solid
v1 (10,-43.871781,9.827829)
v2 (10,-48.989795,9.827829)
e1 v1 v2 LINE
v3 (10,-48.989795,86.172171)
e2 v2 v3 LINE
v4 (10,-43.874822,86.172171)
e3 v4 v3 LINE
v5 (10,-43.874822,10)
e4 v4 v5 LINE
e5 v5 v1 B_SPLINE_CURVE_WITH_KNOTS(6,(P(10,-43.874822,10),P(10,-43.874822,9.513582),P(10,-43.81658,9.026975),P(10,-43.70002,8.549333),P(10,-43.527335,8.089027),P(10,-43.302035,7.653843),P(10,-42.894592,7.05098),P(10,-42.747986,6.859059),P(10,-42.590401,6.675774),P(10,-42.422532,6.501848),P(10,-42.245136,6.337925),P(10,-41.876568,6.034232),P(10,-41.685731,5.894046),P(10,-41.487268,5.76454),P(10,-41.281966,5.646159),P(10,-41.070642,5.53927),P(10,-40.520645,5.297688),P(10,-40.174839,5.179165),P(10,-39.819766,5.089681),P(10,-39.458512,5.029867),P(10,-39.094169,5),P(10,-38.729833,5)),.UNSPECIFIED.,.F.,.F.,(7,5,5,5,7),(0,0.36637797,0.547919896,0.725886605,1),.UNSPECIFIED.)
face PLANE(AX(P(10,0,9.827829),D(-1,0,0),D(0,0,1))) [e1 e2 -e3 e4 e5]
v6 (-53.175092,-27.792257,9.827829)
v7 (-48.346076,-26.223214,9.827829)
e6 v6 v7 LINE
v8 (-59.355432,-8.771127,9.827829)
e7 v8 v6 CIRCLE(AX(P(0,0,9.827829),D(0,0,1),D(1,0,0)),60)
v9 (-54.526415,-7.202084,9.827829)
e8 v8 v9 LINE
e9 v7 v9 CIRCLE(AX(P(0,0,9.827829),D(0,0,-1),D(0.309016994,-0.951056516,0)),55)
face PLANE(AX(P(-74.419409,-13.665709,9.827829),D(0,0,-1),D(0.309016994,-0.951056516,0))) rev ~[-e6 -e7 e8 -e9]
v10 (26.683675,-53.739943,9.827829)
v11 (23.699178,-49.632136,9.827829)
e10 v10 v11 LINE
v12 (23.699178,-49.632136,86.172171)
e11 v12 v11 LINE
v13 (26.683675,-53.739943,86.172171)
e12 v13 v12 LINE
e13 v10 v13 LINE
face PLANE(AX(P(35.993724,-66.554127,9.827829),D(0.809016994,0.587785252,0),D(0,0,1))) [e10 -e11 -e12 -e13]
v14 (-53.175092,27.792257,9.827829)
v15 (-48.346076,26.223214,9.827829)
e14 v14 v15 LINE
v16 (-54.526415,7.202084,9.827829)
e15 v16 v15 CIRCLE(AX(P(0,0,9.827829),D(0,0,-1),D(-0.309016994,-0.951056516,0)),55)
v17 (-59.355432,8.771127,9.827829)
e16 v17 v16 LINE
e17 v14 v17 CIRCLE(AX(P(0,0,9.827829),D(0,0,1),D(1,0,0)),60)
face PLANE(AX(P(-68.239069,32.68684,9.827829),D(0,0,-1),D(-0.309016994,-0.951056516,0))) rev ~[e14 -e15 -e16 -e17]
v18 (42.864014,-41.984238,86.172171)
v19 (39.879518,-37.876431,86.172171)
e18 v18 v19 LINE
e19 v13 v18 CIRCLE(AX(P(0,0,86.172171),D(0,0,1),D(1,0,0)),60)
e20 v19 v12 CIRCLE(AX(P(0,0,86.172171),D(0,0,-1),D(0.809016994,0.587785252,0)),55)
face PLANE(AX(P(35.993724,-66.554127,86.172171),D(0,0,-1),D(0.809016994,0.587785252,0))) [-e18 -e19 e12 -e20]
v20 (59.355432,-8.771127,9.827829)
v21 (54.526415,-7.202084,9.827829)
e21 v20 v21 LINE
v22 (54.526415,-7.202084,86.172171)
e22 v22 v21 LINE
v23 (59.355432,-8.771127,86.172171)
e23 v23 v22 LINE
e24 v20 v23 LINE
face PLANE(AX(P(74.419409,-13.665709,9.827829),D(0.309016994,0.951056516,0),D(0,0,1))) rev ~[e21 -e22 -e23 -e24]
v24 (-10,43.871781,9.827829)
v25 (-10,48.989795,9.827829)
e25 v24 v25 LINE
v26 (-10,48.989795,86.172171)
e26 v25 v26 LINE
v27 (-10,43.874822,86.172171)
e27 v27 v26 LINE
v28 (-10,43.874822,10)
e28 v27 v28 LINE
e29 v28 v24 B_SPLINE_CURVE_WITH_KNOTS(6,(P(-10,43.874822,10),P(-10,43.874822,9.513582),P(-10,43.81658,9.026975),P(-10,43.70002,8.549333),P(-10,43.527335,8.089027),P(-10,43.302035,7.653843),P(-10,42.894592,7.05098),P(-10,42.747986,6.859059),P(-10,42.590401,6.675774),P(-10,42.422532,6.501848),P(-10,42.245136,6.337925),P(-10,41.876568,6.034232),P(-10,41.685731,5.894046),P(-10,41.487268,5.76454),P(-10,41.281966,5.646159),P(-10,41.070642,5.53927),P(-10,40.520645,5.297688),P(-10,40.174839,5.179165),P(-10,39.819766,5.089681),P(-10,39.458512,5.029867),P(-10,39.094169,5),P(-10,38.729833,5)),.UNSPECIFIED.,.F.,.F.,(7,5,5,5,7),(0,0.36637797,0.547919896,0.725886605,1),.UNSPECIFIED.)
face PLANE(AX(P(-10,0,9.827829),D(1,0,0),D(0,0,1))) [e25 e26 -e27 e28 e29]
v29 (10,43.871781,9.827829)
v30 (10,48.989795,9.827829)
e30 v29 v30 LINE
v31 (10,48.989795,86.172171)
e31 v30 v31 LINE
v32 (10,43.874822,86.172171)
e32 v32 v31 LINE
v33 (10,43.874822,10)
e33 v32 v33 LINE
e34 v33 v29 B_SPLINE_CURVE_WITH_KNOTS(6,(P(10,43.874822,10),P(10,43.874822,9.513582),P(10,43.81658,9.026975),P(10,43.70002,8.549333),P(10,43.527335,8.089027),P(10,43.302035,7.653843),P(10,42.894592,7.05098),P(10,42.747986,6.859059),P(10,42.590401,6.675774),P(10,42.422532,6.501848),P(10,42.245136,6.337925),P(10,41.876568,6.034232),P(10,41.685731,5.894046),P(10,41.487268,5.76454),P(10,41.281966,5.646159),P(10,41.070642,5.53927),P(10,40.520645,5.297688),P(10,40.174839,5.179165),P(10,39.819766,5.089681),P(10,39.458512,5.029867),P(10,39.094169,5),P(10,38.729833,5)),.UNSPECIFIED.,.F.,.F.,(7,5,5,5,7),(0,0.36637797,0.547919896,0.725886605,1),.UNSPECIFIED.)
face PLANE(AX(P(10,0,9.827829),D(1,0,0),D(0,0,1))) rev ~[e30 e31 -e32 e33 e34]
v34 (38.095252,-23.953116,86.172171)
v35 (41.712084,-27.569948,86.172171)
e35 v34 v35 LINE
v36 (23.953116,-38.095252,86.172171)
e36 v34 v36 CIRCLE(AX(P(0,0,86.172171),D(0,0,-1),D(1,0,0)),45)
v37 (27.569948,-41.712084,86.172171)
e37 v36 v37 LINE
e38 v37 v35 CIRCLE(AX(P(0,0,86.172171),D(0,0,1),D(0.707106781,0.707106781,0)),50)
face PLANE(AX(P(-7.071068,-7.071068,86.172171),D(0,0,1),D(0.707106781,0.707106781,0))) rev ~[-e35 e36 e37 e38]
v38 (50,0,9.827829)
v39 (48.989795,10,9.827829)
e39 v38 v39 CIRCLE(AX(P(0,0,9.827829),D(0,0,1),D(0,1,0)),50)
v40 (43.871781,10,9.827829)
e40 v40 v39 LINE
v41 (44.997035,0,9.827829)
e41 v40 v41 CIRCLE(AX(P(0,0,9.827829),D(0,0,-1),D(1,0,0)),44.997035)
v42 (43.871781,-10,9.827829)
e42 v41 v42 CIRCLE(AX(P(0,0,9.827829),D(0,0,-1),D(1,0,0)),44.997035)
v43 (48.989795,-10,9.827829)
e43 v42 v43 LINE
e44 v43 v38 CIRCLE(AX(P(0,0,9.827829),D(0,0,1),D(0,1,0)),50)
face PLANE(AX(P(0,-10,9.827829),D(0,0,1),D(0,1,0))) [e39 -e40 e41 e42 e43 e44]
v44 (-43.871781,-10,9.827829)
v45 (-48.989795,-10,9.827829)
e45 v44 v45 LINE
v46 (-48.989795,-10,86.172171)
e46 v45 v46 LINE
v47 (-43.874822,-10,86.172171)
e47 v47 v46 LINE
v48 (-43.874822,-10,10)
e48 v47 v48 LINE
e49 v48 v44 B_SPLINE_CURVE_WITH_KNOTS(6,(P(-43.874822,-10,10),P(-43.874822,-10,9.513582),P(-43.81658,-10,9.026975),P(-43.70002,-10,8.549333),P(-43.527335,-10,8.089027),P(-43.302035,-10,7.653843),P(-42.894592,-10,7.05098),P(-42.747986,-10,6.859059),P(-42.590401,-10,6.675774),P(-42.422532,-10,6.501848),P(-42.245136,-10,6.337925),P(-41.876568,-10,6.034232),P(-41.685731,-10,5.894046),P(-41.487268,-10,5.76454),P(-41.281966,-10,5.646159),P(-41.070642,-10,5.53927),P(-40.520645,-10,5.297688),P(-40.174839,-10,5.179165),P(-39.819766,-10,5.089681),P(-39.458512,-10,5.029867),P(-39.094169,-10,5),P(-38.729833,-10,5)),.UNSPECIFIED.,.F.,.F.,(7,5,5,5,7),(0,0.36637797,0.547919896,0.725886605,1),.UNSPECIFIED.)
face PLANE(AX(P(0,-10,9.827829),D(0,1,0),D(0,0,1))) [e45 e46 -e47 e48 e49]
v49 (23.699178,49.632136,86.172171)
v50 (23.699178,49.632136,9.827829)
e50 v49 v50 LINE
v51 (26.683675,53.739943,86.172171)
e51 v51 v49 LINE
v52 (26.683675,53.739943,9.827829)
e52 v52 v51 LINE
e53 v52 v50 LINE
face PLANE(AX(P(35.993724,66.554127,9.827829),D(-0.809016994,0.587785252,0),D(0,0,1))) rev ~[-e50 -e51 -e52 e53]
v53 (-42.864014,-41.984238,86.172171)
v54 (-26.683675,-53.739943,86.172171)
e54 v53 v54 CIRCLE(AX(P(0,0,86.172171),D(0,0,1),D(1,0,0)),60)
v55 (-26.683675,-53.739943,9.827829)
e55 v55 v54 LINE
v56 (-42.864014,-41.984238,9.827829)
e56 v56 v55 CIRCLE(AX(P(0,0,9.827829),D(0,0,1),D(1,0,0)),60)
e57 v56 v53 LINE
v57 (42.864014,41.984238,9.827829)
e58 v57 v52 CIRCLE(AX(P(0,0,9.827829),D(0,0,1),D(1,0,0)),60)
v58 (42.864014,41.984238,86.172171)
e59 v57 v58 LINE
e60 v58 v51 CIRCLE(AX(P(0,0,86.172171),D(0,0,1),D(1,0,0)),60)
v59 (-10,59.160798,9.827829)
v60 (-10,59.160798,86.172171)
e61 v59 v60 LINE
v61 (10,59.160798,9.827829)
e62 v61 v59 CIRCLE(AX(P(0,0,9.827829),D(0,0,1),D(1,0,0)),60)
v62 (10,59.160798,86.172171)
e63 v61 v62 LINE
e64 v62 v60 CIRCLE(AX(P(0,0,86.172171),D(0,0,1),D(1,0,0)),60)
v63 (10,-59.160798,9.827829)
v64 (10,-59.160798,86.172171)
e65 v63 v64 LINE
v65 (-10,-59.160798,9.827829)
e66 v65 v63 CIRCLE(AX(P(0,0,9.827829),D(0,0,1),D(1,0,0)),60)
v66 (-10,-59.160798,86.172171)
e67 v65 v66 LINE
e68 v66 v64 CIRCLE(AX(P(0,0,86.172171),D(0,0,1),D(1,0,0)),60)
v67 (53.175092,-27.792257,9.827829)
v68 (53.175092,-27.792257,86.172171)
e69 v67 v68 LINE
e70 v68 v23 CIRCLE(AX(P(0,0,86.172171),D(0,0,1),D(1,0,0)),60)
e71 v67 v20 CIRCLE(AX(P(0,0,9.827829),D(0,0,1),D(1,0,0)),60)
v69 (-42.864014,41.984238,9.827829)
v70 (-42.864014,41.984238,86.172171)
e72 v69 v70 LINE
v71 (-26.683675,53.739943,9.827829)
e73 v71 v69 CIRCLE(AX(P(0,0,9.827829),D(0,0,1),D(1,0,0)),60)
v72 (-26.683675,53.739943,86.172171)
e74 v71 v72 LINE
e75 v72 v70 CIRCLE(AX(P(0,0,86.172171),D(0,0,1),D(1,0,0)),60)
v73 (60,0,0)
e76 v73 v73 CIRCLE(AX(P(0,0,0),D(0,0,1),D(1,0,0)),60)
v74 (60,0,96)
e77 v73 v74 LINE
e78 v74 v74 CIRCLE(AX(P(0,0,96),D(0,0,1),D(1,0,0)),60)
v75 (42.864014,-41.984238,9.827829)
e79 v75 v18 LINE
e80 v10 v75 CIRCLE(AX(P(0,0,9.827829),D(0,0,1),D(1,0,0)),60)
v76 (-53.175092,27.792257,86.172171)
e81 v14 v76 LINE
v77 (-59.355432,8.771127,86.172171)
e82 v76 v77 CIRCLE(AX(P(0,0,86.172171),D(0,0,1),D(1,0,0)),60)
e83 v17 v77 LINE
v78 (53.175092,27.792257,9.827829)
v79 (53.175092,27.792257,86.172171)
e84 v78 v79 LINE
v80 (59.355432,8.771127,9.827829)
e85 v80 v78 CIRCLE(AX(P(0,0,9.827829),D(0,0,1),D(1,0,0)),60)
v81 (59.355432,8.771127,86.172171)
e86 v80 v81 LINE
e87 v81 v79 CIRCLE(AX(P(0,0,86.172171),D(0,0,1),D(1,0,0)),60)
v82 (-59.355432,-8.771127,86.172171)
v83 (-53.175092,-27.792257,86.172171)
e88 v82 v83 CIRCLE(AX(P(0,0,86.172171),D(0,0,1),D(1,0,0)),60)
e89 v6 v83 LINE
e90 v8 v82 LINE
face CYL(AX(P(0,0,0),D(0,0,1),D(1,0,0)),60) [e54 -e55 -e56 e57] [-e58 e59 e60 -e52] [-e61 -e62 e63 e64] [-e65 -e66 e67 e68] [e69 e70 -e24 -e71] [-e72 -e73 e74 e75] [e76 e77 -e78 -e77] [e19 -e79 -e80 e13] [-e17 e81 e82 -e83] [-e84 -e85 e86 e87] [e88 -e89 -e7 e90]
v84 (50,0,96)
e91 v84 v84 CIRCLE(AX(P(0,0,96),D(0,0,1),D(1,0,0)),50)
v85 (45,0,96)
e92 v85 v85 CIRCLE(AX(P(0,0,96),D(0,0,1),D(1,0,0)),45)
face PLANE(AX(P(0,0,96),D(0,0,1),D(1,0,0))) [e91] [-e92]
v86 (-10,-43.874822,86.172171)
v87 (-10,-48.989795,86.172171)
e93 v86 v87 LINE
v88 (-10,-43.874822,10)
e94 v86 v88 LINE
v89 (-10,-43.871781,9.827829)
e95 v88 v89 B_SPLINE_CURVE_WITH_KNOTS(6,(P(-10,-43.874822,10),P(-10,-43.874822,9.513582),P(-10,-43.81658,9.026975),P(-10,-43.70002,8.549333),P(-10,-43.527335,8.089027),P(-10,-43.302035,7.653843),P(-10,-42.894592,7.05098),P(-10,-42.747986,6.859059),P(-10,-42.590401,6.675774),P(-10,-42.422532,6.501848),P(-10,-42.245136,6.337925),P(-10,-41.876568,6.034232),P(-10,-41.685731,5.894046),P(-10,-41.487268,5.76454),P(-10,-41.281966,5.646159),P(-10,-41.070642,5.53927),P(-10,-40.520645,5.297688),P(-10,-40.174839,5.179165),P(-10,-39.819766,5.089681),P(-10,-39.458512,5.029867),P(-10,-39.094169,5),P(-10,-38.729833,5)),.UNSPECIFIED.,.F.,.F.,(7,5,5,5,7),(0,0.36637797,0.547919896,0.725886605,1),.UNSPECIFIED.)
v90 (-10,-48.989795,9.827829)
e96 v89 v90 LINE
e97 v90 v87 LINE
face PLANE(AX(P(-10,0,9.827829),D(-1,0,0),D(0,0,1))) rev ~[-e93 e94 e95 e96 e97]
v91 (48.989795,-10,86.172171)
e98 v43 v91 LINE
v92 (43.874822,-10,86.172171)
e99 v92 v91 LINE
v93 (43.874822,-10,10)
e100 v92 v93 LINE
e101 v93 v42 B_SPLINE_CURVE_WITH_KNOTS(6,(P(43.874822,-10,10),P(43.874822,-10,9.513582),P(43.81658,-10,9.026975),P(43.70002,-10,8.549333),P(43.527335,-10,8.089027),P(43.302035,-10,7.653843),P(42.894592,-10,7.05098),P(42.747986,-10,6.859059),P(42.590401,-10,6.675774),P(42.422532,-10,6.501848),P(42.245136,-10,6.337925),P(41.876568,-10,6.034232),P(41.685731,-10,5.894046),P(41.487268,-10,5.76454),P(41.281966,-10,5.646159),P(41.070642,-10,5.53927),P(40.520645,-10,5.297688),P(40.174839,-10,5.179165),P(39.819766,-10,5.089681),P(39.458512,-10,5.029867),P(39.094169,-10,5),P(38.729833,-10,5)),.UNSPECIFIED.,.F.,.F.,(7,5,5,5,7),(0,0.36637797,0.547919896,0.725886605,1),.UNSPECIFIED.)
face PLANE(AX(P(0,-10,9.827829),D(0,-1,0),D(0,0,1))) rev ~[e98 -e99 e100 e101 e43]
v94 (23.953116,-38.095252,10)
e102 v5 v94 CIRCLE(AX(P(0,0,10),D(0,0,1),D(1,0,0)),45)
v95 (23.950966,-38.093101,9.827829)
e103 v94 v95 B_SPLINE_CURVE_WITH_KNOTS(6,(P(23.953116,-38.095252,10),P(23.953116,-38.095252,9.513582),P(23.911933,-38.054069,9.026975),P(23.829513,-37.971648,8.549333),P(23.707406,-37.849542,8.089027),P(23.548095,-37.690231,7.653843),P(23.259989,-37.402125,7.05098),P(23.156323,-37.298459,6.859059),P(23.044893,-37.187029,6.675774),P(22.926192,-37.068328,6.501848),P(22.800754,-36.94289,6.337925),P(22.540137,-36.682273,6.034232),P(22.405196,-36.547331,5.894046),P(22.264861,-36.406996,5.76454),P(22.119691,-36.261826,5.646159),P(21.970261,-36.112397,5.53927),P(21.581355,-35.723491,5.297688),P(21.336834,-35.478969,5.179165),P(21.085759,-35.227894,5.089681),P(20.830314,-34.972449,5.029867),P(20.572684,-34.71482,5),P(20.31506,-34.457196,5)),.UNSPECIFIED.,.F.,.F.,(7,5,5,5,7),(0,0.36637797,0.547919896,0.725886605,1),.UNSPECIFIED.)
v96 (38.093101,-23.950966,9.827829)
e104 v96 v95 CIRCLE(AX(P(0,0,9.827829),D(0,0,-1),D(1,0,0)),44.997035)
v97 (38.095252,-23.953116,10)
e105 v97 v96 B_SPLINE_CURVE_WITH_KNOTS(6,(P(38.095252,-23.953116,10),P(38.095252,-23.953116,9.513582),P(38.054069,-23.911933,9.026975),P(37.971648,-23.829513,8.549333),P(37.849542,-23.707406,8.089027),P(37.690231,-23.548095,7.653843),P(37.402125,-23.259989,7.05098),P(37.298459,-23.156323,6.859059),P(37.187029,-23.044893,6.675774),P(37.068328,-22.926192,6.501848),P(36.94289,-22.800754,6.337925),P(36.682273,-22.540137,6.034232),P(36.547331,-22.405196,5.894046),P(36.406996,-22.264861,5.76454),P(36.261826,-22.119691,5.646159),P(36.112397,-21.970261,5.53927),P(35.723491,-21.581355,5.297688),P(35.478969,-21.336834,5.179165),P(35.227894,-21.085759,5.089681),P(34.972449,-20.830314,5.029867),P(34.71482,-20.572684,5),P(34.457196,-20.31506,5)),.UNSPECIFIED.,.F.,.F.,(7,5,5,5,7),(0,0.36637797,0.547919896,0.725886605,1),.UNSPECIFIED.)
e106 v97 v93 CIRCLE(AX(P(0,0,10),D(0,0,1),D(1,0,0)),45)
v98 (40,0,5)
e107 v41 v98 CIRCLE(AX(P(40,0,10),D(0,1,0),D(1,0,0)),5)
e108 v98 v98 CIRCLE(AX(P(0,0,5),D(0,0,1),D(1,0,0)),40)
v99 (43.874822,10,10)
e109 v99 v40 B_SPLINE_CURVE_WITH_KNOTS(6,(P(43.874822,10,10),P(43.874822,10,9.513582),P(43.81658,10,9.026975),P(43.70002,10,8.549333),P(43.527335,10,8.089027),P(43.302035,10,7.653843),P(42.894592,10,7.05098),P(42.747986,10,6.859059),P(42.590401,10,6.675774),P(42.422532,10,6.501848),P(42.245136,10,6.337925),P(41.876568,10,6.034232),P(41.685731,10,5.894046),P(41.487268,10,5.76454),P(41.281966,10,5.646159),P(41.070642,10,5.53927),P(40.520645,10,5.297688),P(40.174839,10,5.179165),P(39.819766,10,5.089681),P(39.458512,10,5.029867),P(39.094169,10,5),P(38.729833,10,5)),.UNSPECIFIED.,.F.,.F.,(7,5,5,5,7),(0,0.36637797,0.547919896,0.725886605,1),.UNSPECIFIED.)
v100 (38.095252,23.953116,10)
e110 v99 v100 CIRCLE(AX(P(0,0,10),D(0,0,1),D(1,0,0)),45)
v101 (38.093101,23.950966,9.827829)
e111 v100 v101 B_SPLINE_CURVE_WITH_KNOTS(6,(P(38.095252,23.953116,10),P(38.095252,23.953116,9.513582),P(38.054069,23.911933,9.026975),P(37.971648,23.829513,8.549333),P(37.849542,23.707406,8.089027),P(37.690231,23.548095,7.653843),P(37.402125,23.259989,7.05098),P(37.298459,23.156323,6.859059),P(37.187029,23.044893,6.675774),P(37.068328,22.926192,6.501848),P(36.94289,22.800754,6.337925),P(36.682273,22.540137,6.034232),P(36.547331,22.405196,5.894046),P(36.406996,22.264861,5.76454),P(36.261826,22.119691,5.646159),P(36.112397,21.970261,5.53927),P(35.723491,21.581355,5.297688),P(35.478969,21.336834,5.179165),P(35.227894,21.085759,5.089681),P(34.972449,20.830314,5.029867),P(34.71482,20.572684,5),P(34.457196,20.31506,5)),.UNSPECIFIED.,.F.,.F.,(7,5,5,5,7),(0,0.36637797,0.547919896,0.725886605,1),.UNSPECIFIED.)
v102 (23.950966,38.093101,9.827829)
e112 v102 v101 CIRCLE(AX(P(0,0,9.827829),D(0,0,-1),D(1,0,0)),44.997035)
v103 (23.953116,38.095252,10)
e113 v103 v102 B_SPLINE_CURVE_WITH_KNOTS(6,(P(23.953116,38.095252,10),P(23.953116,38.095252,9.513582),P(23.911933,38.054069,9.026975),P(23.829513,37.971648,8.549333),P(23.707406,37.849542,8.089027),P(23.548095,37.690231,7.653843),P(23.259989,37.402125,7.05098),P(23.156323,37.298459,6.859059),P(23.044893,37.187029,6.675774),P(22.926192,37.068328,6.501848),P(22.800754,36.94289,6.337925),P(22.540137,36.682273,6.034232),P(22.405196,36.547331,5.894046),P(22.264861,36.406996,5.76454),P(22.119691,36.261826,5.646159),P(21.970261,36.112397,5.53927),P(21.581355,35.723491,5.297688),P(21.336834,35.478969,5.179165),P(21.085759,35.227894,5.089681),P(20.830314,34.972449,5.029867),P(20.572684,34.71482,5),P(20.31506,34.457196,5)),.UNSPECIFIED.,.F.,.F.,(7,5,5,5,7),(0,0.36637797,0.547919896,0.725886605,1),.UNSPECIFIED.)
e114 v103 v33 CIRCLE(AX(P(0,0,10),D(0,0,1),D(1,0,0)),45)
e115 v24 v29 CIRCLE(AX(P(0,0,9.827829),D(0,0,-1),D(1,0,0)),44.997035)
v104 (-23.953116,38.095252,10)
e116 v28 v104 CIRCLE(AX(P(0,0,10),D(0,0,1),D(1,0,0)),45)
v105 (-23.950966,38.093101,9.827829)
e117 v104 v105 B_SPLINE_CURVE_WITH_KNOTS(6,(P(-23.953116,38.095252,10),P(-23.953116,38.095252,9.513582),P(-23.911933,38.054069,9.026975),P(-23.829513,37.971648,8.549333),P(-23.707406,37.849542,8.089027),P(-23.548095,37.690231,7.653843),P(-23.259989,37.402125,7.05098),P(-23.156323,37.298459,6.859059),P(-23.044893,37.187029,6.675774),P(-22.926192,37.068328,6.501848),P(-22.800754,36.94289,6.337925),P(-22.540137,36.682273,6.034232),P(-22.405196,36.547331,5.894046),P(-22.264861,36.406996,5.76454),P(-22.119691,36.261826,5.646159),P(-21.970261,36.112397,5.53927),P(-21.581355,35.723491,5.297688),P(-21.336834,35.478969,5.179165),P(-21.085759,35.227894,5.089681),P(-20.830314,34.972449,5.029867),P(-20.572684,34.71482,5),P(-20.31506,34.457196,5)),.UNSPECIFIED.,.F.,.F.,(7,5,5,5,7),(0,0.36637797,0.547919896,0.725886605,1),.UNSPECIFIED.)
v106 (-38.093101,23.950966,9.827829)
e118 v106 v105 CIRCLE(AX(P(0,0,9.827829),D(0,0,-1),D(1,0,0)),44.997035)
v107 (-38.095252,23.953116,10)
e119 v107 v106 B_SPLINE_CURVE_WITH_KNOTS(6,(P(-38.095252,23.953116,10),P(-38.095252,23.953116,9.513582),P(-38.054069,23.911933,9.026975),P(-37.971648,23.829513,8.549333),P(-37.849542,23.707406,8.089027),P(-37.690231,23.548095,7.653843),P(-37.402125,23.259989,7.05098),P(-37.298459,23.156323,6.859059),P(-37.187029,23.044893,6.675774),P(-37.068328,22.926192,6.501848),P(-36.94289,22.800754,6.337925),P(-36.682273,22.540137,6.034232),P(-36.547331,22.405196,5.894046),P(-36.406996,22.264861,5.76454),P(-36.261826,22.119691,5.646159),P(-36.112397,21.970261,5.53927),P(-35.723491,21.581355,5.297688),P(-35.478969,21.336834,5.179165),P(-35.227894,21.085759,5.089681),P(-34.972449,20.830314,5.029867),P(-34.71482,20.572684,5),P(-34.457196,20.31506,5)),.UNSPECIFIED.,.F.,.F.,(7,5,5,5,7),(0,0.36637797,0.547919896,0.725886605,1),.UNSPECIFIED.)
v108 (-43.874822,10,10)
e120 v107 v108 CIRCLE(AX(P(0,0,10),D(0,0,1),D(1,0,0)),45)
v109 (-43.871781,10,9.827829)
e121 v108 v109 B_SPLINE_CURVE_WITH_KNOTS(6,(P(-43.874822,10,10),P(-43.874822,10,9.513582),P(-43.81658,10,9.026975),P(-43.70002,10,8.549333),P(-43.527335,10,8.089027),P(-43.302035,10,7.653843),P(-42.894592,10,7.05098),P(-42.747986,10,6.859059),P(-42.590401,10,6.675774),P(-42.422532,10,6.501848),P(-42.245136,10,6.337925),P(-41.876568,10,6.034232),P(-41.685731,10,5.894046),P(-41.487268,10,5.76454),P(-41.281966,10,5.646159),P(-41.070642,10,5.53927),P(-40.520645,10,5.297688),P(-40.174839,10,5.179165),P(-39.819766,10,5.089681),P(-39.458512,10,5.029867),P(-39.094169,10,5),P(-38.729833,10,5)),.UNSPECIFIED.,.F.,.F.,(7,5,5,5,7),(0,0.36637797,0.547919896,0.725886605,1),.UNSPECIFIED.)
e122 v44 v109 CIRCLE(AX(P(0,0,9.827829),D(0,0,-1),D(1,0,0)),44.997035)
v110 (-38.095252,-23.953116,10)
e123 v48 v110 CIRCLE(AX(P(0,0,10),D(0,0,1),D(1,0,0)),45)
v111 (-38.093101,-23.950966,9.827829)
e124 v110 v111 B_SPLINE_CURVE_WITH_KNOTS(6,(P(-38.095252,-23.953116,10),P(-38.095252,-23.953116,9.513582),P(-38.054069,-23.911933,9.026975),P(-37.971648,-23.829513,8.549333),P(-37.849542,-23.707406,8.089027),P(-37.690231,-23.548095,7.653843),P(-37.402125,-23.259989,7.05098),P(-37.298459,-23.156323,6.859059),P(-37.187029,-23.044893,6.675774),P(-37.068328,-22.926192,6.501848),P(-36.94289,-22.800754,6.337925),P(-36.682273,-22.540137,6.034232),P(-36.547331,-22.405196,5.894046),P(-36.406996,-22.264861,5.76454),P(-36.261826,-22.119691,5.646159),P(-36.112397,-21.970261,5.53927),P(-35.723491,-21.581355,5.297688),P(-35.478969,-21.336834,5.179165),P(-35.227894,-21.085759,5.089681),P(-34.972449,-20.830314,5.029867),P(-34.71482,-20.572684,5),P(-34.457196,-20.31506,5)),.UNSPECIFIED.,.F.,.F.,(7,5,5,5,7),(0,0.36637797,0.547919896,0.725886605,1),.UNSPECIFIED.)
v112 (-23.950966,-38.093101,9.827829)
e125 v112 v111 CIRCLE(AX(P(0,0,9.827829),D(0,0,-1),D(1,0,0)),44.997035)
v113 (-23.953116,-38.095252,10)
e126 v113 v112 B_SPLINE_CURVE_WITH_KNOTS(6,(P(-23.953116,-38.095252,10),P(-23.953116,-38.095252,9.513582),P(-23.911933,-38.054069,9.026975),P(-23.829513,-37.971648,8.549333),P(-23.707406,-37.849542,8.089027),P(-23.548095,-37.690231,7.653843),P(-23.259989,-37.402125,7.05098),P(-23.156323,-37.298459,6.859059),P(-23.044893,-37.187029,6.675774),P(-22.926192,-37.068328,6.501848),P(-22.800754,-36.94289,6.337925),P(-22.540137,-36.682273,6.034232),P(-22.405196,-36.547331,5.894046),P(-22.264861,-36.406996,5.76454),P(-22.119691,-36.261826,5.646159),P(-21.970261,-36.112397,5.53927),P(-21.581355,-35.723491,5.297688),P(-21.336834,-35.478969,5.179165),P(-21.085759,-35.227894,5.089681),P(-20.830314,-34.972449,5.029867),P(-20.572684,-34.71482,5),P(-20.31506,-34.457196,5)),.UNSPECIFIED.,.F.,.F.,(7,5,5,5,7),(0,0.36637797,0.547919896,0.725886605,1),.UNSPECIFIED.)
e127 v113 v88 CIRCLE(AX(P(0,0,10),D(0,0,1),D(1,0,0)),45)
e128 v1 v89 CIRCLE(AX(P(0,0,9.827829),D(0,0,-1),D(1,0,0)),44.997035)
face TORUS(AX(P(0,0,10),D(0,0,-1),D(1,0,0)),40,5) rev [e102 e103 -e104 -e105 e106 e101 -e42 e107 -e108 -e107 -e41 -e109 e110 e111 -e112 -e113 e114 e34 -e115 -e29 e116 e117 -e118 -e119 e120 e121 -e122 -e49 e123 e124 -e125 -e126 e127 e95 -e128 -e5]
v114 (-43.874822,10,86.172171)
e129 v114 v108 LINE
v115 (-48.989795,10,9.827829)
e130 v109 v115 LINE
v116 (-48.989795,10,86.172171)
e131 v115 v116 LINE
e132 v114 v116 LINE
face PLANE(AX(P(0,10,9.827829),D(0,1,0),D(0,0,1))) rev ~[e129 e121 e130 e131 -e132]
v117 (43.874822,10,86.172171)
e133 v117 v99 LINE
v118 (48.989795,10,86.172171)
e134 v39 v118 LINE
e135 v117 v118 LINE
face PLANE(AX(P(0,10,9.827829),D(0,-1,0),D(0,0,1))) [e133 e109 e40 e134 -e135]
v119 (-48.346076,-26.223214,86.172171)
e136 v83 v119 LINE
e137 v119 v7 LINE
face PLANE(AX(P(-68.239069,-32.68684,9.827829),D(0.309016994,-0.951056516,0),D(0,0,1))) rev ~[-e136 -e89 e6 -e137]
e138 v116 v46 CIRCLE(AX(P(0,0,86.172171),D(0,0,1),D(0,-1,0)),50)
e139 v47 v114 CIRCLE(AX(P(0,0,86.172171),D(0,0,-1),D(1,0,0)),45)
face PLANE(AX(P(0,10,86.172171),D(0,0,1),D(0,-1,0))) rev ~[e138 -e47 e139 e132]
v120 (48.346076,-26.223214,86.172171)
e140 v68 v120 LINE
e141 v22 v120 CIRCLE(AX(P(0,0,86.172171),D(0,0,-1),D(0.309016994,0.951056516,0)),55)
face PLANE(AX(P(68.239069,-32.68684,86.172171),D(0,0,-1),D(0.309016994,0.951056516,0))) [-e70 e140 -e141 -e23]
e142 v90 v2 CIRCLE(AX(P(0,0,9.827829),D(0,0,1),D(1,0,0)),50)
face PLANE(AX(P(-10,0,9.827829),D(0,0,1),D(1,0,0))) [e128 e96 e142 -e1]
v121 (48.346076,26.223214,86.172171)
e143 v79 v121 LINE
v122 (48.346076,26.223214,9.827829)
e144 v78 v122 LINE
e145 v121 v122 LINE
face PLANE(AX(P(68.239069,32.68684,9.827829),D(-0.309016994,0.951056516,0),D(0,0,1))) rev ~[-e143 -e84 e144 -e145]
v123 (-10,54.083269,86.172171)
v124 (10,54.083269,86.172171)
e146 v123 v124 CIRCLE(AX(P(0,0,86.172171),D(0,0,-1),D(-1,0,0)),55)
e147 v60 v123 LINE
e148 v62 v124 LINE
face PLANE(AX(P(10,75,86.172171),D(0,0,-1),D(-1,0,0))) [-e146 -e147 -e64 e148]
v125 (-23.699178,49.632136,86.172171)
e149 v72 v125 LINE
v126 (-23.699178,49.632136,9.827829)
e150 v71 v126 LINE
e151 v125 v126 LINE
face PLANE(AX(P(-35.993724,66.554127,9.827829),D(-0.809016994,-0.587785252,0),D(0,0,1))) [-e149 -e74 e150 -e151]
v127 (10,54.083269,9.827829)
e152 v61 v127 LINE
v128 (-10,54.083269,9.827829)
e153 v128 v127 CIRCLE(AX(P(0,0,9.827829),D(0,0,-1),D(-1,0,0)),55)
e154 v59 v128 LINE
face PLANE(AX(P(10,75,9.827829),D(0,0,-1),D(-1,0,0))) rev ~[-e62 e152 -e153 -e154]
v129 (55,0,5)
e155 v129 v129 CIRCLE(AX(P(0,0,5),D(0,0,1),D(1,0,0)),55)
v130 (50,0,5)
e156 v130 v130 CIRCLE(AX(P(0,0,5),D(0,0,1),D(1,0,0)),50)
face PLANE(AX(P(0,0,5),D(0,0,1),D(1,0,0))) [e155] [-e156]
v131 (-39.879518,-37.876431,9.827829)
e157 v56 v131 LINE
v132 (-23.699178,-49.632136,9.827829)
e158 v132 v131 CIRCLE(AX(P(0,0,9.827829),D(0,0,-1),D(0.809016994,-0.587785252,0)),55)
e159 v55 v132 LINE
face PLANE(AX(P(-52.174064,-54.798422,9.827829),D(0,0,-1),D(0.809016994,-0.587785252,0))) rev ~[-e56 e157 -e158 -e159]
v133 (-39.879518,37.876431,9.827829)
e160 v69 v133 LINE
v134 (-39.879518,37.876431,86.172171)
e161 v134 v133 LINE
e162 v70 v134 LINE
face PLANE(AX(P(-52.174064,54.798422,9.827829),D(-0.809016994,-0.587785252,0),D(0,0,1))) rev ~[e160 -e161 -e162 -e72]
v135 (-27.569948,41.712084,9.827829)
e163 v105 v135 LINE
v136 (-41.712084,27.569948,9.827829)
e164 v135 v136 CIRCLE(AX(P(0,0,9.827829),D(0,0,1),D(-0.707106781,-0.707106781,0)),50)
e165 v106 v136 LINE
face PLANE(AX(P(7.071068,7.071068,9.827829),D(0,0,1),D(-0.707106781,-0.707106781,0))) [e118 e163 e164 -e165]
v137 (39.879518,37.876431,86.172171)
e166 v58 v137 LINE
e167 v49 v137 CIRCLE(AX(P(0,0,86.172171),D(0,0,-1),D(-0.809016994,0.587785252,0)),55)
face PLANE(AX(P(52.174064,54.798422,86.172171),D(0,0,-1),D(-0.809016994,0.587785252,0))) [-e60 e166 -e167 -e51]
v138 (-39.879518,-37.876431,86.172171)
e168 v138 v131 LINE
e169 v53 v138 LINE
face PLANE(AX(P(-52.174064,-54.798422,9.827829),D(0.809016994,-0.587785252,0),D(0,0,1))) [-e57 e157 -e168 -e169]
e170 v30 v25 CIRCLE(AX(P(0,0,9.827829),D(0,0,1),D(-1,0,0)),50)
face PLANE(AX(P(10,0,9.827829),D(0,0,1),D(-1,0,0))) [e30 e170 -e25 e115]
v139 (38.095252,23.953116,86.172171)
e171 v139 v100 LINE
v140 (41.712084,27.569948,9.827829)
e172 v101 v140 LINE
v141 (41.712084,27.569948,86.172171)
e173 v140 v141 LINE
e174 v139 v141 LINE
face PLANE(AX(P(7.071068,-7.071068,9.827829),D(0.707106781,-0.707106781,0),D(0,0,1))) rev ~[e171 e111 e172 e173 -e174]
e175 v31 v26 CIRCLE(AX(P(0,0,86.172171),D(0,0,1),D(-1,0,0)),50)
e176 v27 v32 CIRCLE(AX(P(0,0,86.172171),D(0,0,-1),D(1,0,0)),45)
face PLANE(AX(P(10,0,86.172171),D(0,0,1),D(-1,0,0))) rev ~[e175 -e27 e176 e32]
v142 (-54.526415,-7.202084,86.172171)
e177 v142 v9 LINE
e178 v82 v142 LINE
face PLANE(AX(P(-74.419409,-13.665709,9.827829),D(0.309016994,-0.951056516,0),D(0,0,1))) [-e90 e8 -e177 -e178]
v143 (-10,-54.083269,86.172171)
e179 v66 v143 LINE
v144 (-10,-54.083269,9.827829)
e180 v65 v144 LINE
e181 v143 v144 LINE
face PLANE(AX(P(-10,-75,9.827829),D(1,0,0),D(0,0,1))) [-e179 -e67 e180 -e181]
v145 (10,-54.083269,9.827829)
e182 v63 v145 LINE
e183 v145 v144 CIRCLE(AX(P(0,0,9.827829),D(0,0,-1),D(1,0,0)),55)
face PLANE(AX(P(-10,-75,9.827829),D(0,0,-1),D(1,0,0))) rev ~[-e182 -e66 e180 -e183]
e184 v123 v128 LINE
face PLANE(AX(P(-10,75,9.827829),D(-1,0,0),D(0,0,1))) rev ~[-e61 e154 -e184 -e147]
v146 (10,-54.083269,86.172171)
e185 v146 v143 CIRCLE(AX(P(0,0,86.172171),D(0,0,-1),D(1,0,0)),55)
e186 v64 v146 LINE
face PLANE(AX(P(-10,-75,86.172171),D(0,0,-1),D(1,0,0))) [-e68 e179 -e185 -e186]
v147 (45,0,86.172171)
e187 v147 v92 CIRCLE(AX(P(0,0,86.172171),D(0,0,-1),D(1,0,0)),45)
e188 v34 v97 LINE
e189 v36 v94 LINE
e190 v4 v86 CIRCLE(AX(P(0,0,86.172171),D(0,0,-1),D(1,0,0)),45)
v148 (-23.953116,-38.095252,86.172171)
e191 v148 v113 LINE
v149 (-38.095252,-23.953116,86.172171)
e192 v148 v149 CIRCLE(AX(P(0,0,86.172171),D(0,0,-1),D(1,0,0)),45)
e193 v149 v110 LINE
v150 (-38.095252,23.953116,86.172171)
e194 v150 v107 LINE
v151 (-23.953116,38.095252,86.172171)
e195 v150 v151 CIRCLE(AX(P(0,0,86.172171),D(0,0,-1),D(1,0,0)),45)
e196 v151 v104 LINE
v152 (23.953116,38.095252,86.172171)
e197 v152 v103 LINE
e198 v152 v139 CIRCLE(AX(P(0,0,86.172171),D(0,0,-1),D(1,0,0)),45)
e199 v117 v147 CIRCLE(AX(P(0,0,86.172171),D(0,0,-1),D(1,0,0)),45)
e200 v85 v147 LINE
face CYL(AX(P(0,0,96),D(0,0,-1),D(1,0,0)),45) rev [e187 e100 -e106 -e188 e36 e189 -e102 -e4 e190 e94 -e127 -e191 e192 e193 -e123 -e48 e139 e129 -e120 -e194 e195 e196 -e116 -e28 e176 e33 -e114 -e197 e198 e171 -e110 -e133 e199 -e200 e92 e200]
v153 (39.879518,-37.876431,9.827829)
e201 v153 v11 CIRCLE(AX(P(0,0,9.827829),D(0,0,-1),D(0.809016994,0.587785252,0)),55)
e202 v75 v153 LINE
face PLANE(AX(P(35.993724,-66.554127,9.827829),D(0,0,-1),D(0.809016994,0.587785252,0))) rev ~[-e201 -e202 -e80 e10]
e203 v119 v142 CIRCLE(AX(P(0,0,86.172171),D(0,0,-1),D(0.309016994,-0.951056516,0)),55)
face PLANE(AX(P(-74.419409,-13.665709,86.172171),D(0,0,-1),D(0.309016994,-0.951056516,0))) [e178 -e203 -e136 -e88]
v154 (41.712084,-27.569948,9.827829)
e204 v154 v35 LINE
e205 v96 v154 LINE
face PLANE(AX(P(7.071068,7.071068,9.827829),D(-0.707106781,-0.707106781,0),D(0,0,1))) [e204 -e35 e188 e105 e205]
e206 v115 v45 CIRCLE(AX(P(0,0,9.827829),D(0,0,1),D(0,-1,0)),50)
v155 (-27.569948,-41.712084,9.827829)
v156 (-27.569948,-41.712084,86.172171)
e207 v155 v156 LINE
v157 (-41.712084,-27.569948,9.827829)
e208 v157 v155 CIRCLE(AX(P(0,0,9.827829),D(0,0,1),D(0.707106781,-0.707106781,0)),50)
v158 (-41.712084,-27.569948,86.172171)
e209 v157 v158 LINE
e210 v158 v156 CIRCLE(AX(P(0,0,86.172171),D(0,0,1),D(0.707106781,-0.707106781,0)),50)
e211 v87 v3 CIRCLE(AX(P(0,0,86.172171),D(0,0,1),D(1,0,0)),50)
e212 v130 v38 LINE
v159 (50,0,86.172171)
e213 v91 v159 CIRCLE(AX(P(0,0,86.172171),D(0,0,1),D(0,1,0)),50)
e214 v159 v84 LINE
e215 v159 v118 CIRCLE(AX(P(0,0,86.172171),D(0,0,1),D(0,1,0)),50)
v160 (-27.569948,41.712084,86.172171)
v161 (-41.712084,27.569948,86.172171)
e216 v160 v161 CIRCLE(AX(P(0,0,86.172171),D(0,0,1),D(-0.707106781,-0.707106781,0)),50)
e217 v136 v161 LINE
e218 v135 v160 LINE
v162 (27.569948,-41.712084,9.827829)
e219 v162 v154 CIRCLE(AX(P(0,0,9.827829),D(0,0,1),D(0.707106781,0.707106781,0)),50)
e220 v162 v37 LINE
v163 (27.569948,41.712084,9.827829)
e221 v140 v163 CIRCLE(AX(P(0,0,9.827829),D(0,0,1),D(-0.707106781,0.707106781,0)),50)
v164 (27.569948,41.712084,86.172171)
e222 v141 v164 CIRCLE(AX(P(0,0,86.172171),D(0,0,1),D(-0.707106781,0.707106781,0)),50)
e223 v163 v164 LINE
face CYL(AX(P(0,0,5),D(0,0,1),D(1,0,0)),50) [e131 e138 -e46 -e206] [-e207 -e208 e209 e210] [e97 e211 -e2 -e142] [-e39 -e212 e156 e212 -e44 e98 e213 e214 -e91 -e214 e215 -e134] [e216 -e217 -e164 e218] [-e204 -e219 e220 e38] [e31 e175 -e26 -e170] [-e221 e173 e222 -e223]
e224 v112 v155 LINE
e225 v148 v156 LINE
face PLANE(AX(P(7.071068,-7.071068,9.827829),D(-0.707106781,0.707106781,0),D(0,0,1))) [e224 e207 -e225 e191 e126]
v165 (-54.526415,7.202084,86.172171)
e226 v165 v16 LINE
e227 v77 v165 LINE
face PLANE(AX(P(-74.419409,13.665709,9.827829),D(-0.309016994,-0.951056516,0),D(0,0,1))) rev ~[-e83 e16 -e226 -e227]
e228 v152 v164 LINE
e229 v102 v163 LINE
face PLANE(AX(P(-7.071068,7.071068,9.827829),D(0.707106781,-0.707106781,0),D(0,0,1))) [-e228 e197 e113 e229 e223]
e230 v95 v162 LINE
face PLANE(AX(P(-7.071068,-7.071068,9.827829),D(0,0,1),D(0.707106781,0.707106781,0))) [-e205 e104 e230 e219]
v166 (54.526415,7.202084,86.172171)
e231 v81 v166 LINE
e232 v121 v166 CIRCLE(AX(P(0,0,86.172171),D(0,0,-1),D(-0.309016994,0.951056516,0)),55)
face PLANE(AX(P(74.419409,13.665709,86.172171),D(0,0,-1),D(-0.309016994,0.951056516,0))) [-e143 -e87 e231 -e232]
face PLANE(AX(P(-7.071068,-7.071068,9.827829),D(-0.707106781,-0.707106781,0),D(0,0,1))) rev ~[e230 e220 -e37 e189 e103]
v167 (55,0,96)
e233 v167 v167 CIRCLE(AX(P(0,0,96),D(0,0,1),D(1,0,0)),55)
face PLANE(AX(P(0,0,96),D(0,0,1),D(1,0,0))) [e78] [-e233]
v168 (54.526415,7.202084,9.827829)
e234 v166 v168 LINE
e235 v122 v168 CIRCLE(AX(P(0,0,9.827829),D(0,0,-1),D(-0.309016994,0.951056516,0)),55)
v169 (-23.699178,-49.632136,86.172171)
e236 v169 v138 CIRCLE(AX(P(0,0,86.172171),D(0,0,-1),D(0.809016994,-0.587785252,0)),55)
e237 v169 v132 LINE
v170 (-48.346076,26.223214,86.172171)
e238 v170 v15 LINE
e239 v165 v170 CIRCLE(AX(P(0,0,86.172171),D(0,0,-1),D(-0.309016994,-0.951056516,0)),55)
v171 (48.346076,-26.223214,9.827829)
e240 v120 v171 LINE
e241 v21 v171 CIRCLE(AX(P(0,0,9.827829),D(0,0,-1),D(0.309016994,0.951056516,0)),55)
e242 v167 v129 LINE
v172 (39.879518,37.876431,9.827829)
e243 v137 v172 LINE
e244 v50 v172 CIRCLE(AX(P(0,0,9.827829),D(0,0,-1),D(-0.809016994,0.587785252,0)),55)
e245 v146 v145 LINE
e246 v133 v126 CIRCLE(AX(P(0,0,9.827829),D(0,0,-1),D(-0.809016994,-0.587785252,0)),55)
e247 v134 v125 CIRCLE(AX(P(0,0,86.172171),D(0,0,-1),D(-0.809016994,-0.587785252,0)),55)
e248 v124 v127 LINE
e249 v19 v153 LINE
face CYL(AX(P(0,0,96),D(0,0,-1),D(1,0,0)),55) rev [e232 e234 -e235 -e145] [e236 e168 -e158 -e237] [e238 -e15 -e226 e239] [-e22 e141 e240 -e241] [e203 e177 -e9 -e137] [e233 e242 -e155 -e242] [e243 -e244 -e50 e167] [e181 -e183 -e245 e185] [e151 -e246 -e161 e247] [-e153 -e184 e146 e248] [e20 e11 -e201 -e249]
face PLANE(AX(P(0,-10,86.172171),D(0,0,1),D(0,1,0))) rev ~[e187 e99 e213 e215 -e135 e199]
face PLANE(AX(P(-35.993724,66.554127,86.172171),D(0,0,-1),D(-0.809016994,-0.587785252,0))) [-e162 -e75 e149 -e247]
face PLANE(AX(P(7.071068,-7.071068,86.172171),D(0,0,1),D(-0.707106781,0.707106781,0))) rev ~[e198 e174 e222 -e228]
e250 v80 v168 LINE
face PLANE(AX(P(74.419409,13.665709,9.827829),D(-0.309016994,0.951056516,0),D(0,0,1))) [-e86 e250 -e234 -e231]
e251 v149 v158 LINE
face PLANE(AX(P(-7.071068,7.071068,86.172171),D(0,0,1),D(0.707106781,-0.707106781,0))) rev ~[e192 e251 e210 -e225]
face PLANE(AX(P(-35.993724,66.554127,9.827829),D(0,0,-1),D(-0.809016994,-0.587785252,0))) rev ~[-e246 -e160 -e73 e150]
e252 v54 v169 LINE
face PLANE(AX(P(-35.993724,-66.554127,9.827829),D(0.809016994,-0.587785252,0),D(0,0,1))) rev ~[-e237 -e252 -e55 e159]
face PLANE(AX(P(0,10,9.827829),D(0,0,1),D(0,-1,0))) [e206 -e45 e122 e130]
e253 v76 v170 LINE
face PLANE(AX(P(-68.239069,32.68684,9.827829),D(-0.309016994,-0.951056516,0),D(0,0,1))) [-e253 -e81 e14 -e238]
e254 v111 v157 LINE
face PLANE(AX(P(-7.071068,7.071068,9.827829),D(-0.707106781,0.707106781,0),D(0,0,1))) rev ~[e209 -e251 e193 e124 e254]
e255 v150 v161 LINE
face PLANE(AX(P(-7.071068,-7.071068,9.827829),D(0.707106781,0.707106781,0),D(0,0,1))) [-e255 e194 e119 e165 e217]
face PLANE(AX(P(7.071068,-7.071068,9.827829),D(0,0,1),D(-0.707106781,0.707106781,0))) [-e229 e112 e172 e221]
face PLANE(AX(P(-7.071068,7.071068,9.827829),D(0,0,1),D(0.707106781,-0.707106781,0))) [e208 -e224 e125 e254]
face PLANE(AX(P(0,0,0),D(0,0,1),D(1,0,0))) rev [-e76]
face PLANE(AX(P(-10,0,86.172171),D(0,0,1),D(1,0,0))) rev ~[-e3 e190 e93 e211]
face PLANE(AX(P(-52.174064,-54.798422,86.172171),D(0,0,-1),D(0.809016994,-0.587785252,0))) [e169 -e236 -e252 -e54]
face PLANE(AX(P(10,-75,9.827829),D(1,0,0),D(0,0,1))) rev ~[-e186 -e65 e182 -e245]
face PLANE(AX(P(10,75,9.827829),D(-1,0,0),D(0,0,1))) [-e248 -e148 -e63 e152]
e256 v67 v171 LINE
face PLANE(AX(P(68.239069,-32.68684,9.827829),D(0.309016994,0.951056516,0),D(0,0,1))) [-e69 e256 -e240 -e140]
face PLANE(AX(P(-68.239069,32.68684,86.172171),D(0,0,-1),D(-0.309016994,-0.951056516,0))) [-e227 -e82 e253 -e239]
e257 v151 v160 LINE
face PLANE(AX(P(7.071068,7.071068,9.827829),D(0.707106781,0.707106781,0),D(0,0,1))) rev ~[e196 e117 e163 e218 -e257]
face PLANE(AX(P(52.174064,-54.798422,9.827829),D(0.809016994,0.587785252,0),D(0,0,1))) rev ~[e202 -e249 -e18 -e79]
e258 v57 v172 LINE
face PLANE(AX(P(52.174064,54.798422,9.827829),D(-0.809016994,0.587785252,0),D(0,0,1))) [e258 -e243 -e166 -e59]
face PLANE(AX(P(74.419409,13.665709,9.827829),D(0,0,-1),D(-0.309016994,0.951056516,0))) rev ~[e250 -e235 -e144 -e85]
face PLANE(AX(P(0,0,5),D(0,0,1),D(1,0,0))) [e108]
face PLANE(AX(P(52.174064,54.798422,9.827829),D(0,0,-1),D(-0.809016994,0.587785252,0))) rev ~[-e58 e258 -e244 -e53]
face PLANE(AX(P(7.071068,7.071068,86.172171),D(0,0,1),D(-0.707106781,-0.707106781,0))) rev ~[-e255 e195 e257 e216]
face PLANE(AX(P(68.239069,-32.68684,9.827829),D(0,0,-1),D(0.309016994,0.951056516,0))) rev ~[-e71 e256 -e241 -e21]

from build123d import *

# Parameters (mm, degrees)
F2_W            = 20
F2_H            = 76.3443418741
F3_REACH        = 138.9215837294
F3_COPIES_COUNT = 8
F5_W            = 20
F5_H            = 76.3443418741
F6_REACH        = 213.9215837294
F6_COPIES_COUNT = 10


# Not quite as in the source:
# - a pattern or mirror of a feature is missing from the dataset's text; its kind, count and spacing are read off the source's solid


with BuildPart() as f1:
    # F0 (on Front) → F1 (revolve)
    with BuildSketch(Plane.XZ):
        with BuildLine():
            Line((0, 5), (0, 0))
            Line((0, 0), (60, 0))
            Line((60, 0), (60, 96))
            Line((60, 96), (55, 96))
            Line((55, 96), (55, 5))
            Line((55, 5), (50, 5))
            Line((50, 5), (50, 96))
            Line((50, 96), (45, 96))
            Line((45, 96), (45, 10))
            ThreePointArc((45, 10), (43.5355339059, 6.4644660941), (40, 5))
            Line((40, 5), (0, 5))
        make_face()
    revolve(axis=Axis((0, 0, 2.5), (0, 0, 1)))

    f3_end = f1.faces().sort_by_distance((-50, 0, 50.5))[0]
    # F2 (on Front) → F3 (cut, up to a face of the model that its end follows)
    with BuildSketch(Plane.XZ):
        with Locations((0, 48)):
            Rectangle(F2_W, F2_H)
    f3_long = extrude(amount=F3_REACH, mode=Mode.PRIVATE)
    f3 = split(f3_long, bisect_by=f3_end, keep=Keep.BOTTOM, mode=Mode.PRIVATE)
    add(f3, mode=Mode.SUBTRACT)

    # F3_copies: F3 ×8 about axis
    f3_copies_axis = Axis((0, 0, 0), (0, 0, 1))
    for i in range(1, F3_COPIES_COUNT):
        add(f3.rotate(f3_copies_axis, i * 360 / F3_COPIES_COUNT), mode=Mode.SUBTRACT)

    f6_end = f1.faces().sort_by_distance((-55, 0, 50.5))[0]
    # F5 (on offset) → F6 (cut, up to a face of the model that its end follows)
    with BuildSketch(Plane.XZ.offset(75)):
        with Locations((0, 48)):
            Rectangle(F5_W, F5_H)
    f6_long = extrude(amount=-F6_REACH, mode=Mode.PRIVATE)
    f6 = split(f6_long, bisect_by=f6_end, keep=Keep.ALL, mode=Mode.PRIVATE).solids().sort_by_distance((0, -75, 48))[0]
    add(f6, mode=Mode.SUBTRACT)

    # F6_copies: F6 ×10 about axis
    f6_copies_axis = Axis((0, 0, 0), (0, 0, 1))
    for i in range(1, F6_COPIES_COUNT):
        add(f6.rotate(f6_copies_axis, i * 360 / F6_COPIES_COUNT), mode=Mode.SUBTRACT)


solid = f1.part
